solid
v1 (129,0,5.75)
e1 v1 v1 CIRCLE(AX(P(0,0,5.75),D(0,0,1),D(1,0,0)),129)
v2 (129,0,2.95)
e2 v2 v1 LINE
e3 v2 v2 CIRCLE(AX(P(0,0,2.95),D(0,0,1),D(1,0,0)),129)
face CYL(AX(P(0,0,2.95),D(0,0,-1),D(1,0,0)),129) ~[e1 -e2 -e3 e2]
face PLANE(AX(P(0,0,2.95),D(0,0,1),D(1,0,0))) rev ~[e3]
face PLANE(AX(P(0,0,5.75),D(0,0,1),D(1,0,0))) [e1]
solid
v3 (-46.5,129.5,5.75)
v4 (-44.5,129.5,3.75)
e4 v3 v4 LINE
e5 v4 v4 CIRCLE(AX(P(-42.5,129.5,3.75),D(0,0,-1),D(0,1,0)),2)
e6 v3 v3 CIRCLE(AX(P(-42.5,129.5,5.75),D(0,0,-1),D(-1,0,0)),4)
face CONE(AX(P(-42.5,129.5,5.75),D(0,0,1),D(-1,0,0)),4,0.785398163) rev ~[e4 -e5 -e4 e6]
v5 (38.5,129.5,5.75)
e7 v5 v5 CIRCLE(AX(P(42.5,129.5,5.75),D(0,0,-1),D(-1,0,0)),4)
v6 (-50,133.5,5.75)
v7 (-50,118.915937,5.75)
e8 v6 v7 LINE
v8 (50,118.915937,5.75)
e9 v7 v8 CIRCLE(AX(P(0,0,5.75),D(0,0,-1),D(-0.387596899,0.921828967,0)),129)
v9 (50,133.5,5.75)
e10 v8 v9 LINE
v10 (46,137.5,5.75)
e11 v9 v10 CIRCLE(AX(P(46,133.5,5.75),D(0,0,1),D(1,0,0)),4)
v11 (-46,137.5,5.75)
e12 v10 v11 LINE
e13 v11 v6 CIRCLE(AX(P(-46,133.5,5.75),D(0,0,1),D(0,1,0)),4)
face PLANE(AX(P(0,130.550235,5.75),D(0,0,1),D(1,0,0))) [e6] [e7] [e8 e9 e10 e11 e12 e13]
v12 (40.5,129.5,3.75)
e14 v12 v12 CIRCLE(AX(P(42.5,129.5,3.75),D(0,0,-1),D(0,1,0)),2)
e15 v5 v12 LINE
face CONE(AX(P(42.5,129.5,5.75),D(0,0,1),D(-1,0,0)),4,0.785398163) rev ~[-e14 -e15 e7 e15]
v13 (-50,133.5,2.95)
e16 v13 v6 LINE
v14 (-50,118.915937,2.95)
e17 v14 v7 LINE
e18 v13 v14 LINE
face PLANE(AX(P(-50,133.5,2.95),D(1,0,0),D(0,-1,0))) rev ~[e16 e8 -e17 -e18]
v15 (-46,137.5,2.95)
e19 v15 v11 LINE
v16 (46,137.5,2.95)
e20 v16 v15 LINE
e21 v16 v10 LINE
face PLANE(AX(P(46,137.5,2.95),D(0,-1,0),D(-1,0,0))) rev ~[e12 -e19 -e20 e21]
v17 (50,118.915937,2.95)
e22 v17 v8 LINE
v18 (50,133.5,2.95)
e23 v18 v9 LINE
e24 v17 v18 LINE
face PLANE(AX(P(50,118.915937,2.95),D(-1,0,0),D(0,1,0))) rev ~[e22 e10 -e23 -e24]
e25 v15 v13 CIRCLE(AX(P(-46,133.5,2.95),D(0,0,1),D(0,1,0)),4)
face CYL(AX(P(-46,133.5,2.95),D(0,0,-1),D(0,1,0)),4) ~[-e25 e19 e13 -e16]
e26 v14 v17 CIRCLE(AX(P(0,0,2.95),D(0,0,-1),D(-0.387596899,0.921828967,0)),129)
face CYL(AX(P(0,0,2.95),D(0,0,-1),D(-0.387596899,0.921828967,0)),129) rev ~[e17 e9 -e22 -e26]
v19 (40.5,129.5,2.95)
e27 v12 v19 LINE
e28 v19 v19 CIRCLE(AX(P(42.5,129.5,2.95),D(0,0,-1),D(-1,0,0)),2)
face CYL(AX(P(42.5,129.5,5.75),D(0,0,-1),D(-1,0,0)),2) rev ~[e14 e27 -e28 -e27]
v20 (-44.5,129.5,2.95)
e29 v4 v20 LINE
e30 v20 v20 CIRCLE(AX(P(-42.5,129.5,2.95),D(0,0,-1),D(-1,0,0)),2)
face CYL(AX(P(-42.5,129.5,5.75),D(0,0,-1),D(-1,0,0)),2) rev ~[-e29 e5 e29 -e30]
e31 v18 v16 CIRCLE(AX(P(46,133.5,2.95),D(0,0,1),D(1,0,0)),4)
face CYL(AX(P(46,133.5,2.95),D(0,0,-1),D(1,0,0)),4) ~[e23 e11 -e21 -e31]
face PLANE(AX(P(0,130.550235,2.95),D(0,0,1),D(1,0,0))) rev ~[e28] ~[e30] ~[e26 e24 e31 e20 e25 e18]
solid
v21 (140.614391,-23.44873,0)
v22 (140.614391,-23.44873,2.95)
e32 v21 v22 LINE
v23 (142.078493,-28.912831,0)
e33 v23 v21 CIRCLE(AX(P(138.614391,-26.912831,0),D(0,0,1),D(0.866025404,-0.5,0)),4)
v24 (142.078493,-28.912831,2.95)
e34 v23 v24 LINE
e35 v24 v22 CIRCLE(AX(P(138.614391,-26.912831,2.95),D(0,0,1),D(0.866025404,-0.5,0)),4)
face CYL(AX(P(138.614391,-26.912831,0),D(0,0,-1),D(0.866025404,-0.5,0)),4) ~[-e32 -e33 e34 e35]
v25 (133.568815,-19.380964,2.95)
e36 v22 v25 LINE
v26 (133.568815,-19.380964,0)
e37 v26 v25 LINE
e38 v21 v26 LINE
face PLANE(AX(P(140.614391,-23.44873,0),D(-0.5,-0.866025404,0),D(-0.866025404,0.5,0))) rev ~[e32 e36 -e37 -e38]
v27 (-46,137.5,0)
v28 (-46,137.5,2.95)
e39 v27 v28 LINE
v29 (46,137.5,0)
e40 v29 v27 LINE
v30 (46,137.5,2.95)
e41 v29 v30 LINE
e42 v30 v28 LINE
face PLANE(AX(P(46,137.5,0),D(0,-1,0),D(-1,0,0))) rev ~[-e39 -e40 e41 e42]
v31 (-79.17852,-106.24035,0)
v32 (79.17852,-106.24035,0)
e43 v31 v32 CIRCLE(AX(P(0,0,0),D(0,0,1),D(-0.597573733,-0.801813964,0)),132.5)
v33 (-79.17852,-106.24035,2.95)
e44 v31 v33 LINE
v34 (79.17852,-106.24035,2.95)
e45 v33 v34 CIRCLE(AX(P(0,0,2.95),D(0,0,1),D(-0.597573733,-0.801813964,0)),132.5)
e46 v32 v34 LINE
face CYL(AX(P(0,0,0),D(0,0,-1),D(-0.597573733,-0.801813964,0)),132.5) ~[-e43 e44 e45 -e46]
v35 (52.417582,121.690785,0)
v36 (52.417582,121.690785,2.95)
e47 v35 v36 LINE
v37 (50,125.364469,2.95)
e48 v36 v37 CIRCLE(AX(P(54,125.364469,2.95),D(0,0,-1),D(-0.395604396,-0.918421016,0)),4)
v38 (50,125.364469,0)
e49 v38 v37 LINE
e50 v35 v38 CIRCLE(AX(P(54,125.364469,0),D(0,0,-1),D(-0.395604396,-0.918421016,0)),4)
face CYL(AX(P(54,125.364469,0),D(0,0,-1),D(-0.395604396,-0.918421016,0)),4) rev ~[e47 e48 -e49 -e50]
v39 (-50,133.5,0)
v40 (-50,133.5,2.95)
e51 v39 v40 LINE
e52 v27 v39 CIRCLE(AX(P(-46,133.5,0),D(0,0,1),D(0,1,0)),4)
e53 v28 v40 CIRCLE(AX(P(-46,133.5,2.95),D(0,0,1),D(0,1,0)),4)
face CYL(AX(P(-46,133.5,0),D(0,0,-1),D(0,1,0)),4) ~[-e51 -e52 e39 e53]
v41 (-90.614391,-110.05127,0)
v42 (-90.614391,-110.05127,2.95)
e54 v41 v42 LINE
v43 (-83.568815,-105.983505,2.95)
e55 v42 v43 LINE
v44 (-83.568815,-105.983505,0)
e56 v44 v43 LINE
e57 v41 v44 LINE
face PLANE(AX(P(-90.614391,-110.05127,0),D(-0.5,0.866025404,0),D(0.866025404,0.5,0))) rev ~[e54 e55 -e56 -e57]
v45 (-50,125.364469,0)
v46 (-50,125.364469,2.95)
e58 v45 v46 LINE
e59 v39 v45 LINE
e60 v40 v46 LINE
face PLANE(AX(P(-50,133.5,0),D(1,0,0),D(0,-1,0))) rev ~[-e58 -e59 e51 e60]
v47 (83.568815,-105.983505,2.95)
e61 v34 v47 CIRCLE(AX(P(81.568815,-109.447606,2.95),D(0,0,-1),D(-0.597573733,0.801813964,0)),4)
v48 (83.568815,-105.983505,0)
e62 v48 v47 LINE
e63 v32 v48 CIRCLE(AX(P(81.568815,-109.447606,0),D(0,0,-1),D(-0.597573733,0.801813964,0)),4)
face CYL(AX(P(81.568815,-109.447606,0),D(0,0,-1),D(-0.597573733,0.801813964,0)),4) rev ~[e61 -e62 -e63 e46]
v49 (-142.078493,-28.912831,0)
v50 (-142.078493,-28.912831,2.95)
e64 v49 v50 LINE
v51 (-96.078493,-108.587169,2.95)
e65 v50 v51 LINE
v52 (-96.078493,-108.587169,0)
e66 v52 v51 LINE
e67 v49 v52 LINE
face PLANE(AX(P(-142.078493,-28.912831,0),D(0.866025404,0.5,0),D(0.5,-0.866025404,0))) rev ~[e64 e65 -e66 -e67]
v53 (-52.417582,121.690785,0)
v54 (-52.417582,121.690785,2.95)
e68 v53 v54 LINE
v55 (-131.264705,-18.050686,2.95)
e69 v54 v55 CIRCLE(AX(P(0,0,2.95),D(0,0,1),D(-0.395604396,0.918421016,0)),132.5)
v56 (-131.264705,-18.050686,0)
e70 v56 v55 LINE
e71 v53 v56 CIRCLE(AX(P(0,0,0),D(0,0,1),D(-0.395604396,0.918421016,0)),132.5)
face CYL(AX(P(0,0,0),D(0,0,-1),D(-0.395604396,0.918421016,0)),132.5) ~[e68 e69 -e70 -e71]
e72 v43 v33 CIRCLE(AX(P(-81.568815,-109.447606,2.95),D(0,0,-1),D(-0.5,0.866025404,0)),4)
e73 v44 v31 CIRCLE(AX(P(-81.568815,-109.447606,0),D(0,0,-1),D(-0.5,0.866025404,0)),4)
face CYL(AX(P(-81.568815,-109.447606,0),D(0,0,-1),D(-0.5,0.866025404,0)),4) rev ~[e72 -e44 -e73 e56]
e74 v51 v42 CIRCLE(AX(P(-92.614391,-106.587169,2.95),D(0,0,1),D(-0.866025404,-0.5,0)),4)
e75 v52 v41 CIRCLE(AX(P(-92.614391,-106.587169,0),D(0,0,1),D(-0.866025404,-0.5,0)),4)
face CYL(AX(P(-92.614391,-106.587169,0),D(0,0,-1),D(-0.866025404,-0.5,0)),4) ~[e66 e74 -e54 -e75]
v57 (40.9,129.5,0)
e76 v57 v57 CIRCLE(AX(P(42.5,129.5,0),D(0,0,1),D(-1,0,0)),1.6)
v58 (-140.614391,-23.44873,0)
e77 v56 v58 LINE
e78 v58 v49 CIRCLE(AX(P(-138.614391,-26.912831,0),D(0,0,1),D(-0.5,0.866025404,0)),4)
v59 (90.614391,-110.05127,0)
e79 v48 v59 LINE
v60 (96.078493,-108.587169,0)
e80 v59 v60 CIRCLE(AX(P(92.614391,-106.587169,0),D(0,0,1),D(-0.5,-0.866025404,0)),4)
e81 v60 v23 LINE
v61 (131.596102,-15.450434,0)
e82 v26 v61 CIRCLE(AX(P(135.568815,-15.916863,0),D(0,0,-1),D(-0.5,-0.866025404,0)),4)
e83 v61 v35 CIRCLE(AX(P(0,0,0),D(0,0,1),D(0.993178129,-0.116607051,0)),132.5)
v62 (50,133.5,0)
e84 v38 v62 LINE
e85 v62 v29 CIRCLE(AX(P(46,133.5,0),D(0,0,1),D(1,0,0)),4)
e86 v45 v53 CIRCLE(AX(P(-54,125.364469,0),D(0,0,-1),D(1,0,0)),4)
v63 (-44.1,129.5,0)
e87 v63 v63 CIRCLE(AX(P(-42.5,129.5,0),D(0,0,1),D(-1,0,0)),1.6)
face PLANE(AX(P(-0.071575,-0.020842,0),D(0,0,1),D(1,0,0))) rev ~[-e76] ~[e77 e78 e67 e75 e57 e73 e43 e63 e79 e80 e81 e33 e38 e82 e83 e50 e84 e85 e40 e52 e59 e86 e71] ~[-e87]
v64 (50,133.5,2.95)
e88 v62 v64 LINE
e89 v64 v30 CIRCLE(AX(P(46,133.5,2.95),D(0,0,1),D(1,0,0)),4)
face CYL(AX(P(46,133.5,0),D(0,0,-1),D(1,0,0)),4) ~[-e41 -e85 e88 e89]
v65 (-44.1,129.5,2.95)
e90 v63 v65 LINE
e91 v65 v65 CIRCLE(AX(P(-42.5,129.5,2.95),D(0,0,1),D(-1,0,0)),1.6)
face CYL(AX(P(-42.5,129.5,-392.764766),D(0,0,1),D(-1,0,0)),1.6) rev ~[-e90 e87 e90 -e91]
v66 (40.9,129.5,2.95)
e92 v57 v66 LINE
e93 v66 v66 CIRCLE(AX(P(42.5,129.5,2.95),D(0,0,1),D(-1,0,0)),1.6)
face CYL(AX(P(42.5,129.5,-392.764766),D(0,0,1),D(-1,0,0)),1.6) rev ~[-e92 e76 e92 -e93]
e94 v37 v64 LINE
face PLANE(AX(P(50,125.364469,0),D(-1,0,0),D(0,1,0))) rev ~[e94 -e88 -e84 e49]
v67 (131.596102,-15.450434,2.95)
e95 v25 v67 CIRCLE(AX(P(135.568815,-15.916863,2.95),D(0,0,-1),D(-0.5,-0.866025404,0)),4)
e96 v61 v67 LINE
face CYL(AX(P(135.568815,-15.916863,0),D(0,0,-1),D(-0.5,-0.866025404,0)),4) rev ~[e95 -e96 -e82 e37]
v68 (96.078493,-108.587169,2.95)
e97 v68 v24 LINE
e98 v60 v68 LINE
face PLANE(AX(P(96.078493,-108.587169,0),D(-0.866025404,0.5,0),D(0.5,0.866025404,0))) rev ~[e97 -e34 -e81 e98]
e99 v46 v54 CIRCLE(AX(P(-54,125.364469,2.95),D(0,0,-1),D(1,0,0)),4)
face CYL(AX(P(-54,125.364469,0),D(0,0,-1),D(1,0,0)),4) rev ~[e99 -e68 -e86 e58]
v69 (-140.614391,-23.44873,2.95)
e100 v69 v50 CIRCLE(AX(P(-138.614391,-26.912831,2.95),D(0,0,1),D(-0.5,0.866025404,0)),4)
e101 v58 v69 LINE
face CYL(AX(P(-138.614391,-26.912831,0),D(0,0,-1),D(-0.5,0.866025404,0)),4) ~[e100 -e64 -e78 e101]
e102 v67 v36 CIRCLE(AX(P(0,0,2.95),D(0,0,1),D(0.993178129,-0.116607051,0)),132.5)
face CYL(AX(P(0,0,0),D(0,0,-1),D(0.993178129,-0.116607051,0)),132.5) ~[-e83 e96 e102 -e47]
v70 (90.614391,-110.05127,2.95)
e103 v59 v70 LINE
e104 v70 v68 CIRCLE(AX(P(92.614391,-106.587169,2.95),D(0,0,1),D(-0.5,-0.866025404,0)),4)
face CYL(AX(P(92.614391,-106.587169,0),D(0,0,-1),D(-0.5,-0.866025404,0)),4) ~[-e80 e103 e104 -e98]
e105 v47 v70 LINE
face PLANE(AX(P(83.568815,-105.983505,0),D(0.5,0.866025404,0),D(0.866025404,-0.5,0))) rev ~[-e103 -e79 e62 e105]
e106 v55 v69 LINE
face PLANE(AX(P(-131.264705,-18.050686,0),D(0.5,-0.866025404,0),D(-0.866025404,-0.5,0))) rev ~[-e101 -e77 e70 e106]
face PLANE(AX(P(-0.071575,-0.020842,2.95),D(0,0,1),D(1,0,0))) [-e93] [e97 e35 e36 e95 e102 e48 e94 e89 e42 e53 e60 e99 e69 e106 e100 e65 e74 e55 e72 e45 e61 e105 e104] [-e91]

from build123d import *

# Parameters (mm, degrees)
F2_DEPTH       = 2.95
F3_D           = 3.2
F4_R           = 129
F5_DEPTH       = 2.8
F6_R           = 1.6
F7_DEPTH       = 2.8
F9_D           = 4
F9_CSINK_D     = 8
F9_CSINK_ANGLE = 90


# Not quite as in the source:
# - a feature names something its author has since deleted; it is built from what else it names


with BuildPart() as f2:
    # F1 (on Top) → F2 (new body)
    with BuildSketch(Plane.XY):
        with BuildLine():
            ThreePointArc((-83.5688145832, -105.9835045144), (-81.3352017208, -105.4544338279), (-79.1785196504, -106.2403502723))
            ThreePointArc((-79.1785196504, -106.2403502723), (0, -132.5), (79.1785196504, -106.2403502723))
            ThreePointArc((79.1785196504, -106.2403502723), (81.3352017208, -105.4544338279), (83.5688145832, -105.9835045144))
            Line((83.5688145832, -105.9835045144), (90.6143914052, -110.0512701892))
            ThreePointArc((90.6143914052, -110.0512701892), (93.6496675856, -110.4508718792), (96.0784930204, -108.5871685741))
            Line((96.0784930204, -108.5871685741), (142.0784930204, -28.9128314259))
            ThreePointArc((142.0784930204, -28.9128314259), (142.4780947104, -25.8775552455), (140.6143914052, -23.4487298108))
            Line((140.6143914052, -23.4487298108), (133.5688145832, -19.380964136))
            ThreePointArc((133.5688145832, -19.380964136), (131.9938194971, -17.7111339982), (131.5961020679, -15.4504343151))
            ThreePointArc((131.5961020679, -15.4504343151), (114.7483660014, 66.25), (52.4175824176, 121.6907845874))
            ThreePointArc((52.4175824176, 121.6907845874), (50.6586177763, 123.1655678261), (50, 125.3644686504))
            Line((50, 125.3644686504), (50, 133.5))
            ThreePointArc((50, 133.5), (48.8284271247, 136.3284271247), (46, 137.5))
            Line((46, 137.5), (-46, 137.5))
            ThreePointArc((-46, 137.5), (-48.8284271247, 136.3284271247), (-50, 133.5))
            Line((-50, 133.5), (-50, 125.3644686504))
            ThreePointArc((-50, 125.3644686504), (-50.6586177763, 123.1655678261), (-52.4175824176, 121.6907845874))
            ThreePointArc((-52.4175824176, 121.6907845874), (-115.3980732063, 65.1117093946), (-131.2647048648, -18.0506857698))
            Line((-131.2647048648, -18.0506857698), (-140.6143914052, -23.4487298108))
            ThreePointArc((-140.6143914052, -23.4487298108), (-142.4780947104, -25.8775552455), (-142.0784930204, -28.9128314259))
            Line((-142.0784930204, -28.9128314259), (-96.0784930204, -108.5871685741))
            ThreePointArc((-96.0784930204, -108.5871685741), (-93.6496675856, -110.4508718792), (-90.6143914052, -110.0512701892))
            Line((-90.6143914052, -110.0512701892), (-83.5688145832, -105.9835045144))
        make_face()
    extrude(amount=F2_DEPTH)

    # F3 (through all)
    with Locations(Plane(origin=(0, 0, 0), x_dir=(1, 0, 0), z_dir=(0, 0, -1))):
        with Locations((-42.5, -129.5), (42.5, -129.5)):
            Hole(F3_D / 2)


with BuildPart() as f5:
    # F4 (on face) → F5 (new body)
    with BuildSketch(Plane.XY.offset(2.95)):
        Circle(F4_R)
    extrude(amount=F5_DEPTH)


with BuildPart() as f7:
    # F6 (on face) → F7 (new body)
    with BuildSketch(Plane.XY.offset(2.95)):
        with BuildLine():
            ThreePointArc((-46, 137.5), (-48.8284271247, 136.3284271247), (-50, 133.5))
            Line((-50, 133.5), (-50, 125.3644686504))
            Line((-50, 125.3644686504), (-50, 118.9159366948))
            ThreePointArc((-50, 118.9159366948), (0, 129), (50, 118.9159366948))
            Line((50, 118.9159366948), (50, 125.3644686504))
            Line((50, 125.3644686504), (50, 133.5))
            ThreePointArc((50, 133.5), (48.8284271247, 136.3284271247), (46, 137.5))
            Line((46, 137.5), (-46, 137.5))
        make_face()
        with Locations((-42.5, 129.5)):
            Circle(F6_R, mode=Mode.SUBTRACT)
        with Locations((42.5, 129.5)):
            Circle(F6_R, mode=Mode.SUBTRACT)
    extrude(amount=F7_DEPTH)

    # F9 (through all)
    with Locations(Plane.XY.offset(5.75)):
        with Locations((42.5, 129.5), (-42.5, 129.5)):
            CounterSinkHole(F9_D / 2, F9_CSINK_D / 2, counter_sink_angle=F9_CSINK_ANGLE)


solid = Compound([f2.part, f5.part, f7.part])
